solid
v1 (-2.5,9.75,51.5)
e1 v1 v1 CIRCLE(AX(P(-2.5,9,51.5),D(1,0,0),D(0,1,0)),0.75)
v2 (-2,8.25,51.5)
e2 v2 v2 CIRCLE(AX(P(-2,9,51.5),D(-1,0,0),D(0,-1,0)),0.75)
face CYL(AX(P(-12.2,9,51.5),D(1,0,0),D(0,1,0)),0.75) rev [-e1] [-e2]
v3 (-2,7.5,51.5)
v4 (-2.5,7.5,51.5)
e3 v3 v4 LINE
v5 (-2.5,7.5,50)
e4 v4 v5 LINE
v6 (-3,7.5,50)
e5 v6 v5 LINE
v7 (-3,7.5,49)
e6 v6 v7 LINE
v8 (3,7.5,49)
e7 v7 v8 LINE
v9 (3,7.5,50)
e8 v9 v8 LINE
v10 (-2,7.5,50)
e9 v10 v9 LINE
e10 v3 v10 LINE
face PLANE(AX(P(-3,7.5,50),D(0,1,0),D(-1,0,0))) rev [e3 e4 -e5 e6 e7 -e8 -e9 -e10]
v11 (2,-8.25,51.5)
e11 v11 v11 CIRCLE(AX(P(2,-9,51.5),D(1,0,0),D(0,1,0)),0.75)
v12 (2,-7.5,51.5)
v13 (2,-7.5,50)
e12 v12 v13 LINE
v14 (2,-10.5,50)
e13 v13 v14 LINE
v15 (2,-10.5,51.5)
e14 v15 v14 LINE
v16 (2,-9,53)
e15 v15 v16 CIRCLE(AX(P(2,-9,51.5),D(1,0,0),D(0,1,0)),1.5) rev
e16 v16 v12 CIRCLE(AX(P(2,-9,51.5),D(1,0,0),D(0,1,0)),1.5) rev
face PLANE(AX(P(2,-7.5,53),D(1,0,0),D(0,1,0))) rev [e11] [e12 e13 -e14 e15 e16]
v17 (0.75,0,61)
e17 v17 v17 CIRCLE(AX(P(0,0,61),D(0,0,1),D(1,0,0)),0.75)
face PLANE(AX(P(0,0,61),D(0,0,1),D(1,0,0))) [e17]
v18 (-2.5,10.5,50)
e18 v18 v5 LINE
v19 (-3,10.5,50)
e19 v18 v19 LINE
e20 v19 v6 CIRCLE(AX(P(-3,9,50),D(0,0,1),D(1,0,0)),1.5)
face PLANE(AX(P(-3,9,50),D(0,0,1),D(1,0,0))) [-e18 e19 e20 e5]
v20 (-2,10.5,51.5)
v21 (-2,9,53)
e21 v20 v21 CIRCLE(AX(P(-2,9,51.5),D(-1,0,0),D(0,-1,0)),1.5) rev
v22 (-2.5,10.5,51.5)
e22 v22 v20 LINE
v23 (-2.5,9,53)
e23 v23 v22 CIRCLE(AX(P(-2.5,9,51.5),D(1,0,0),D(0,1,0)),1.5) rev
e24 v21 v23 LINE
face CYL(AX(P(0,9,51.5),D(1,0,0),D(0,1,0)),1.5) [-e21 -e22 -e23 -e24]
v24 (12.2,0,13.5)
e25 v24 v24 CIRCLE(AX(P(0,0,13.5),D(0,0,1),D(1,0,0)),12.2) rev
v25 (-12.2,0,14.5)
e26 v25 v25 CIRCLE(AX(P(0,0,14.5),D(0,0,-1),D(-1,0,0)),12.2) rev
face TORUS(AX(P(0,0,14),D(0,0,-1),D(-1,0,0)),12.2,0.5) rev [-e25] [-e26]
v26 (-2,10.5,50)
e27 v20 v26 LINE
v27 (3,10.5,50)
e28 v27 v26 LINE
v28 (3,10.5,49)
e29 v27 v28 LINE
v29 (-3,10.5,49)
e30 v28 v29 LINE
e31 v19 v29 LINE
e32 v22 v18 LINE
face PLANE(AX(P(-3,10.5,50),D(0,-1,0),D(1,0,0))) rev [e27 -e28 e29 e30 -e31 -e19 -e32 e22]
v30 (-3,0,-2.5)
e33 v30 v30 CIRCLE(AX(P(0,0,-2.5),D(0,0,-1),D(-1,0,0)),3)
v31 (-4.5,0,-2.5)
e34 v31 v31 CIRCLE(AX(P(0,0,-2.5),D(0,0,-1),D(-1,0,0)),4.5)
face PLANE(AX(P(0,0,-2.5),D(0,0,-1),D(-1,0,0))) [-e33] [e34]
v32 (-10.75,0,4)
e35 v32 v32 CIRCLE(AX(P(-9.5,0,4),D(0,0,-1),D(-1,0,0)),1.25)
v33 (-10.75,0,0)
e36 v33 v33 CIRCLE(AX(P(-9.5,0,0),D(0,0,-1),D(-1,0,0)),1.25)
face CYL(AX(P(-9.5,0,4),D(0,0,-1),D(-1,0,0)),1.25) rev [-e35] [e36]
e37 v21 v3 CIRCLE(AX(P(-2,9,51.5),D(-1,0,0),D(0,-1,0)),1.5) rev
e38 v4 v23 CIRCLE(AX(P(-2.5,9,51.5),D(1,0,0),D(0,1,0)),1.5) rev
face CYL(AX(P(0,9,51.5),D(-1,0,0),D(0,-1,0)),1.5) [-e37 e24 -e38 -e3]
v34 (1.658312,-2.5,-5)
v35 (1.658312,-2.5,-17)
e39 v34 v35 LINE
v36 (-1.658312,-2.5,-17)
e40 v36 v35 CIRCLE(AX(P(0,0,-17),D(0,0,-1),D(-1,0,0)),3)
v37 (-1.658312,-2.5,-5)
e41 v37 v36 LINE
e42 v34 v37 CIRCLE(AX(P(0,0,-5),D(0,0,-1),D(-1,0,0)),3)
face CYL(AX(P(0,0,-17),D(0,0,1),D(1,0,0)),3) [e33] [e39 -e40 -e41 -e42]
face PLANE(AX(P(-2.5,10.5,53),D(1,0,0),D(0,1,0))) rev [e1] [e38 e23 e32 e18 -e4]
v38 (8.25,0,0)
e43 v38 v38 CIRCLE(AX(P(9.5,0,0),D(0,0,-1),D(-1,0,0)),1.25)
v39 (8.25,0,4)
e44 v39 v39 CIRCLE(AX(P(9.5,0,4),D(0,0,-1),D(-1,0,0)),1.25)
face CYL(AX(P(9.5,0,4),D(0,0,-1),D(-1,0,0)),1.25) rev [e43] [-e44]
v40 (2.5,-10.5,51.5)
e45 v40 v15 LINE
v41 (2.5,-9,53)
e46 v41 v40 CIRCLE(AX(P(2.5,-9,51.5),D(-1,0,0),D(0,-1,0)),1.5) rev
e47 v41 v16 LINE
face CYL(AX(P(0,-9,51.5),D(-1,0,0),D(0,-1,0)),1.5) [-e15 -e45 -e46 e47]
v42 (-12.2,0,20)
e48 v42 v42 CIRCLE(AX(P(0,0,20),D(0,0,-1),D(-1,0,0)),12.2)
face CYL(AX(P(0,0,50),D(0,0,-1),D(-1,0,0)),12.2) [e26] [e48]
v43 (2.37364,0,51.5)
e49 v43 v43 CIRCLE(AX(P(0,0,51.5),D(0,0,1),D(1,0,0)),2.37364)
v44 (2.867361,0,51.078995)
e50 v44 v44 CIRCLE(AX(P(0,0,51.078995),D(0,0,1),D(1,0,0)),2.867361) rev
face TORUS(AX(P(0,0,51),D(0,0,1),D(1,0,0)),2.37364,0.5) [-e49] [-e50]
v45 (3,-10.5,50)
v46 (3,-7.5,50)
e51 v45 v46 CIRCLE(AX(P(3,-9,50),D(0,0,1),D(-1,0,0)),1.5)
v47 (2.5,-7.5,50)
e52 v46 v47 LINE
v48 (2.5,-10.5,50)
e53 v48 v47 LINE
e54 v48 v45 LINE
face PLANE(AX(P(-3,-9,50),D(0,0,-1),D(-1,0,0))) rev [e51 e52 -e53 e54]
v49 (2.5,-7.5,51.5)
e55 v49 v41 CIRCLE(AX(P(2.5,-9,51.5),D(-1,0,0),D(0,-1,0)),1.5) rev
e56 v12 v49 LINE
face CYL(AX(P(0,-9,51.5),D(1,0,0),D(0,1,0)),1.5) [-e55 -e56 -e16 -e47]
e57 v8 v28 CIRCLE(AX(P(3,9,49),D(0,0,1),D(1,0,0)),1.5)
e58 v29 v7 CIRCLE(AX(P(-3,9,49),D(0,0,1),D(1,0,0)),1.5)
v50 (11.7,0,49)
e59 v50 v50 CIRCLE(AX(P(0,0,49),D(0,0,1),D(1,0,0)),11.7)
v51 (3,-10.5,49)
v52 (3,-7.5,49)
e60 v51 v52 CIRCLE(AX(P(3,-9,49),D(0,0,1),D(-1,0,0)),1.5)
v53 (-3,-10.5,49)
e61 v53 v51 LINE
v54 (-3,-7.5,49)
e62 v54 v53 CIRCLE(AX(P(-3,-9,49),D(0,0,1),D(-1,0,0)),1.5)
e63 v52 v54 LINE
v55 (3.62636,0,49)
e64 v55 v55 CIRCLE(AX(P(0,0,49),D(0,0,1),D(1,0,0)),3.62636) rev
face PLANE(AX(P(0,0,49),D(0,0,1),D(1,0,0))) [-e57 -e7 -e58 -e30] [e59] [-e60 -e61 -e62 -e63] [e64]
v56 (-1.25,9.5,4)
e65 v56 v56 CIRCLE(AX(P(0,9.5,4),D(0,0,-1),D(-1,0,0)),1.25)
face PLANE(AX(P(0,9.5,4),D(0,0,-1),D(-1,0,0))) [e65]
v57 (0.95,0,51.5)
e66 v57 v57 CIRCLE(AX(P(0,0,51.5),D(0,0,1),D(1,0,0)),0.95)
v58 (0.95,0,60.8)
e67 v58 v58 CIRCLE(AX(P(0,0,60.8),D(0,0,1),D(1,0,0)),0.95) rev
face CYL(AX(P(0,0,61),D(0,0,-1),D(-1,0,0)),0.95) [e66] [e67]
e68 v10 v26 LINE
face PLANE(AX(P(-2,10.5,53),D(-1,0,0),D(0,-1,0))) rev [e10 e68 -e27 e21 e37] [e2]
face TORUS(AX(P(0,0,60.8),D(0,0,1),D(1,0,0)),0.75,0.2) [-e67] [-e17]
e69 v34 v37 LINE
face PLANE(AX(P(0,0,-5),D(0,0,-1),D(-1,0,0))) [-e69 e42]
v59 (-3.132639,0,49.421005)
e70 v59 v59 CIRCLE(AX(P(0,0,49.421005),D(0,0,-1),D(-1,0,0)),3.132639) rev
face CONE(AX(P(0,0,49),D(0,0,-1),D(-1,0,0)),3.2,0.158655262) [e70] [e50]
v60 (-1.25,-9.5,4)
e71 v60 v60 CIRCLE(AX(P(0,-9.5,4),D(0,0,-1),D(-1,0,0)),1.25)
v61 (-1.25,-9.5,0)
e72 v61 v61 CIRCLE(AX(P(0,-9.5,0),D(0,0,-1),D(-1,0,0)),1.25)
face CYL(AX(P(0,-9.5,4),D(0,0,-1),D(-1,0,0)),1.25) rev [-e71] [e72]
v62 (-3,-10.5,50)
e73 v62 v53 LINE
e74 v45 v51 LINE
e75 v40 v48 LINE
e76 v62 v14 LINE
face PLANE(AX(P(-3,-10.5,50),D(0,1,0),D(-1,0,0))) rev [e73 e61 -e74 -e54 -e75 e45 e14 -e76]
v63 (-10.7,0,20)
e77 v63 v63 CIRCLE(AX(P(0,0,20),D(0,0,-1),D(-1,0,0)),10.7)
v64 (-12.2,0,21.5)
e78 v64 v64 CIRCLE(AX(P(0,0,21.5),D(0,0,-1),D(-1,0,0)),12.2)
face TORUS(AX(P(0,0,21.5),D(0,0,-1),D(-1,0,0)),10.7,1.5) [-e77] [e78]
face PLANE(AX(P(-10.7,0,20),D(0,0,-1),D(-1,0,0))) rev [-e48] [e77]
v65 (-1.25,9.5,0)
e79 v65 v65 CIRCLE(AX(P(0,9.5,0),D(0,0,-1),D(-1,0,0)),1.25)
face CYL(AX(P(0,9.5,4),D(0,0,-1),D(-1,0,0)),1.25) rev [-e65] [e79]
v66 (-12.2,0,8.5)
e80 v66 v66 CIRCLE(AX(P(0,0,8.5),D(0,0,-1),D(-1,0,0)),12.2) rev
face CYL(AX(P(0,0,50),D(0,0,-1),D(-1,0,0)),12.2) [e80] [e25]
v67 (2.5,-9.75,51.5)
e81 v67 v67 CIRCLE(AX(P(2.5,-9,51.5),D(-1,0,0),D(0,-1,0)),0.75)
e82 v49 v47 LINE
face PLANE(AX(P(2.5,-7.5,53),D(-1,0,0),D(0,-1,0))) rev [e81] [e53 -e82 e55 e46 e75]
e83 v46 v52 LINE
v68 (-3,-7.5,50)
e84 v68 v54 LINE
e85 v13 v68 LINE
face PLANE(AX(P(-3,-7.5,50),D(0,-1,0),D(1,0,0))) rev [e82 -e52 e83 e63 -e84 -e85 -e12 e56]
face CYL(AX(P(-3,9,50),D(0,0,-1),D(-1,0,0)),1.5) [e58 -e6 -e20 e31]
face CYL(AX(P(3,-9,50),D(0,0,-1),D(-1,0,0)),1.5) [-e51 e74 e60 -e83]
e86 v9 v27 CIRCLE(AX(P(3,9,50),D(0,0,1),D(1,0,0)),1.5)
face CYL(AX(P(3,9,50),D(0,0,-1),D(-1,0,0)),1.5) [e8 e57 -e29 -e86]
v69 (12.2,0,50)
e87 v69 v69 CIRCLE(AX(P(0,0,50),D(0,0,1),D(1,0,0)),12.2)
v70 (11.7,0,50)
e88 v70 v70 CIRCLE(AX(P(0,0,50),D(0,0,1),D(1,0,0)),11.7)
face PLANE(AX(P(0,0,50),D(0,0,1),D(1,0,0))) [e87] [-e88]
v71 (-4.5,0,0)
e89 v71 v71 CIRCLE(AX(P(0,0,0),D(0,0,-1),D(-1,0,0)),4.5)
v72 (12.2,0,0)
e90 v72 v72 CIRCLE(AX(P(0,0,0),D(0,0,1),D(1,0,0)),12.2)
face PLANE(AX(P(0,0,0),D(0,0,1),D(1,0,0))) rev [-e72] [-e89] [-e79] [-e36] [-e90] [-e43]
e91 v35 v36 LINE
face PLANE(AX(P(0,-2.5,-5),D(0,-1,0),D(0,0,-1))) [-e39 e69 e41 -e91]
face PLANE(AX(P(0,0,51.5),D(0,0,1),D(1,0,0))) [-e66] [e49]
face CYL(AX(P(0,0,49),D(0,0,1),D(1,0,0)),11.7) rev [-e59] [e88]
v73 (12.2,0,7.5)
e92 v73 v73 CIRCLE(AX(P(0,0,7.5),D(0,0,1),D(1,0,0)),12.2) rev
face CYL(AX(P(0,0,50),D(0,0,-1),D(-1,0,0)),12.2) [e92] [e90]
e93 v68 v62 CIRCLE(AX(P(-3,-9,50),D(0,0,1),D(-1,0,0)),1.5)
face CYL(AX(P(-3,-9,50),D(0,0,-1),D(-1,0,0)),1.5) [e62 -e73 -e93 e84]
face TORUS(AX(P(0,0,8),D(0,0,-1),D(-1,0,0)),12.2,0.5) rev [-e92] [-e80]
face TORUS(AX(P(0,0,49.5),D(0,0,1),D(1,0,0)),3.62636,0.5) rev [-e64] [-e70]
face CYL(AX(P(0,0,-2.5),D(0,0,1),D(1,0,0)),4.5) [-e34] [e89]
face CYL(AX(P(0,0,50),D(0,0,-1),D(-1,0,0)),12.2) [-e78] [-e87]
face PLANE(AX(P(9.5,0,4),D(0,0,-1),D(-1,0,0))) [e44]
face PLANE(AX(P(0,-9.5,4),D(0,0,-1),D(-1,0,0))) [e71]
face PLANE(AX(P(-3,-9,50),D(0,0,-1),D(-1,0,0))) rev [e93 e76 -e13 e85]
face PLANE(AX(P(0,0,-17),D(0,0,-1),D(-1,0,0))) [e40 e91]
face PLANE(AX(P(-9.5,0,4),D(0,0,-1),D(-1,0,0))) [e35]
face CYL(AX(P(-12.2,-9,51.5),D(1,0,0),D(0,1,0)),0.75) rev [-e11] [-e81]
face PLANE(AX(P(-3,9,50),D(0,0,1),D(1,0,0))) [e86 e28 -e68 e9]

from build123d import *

# Parameters (mm, degrees)
SKETCH_1_R               = 12.2
EXTRUDE_1_DEPTH          = 50
SKETCH_14_R              = 11.7
CUT_EXTRUDE_4_DEPTH      = 1
FILLET_3_R               = 0.5
SKETCH_16_R              = 0.95
EXTRUDE_7_DEPTH          = 9.5
FILLET_4_R               = 0.2
SKETCH_4_R               = 4.5
EXTRUDE_3_DEPTH          = 2.5
SKETCH_5_R               = 3
EXTRUDE_4_DEPTH          = 14.5
CUT_EXTRUDE_START        = -12
CUT_EXTRUDE_1_DEPTH      = 12
SKETCH_8_R               = 1.25
CUT_EXTRUDE_2_DEPTH      = 4
EXTRUDE_5_DEPTH          = 1
SKETCH_12_W              = 0.5
SKETCH_12_H              = 3
EXTRUDE_6_DEPTH          = 3
FILLET_2_R               = 1.5
CUT_EXTRUDE_3_DEPTH      = 64.80814995
CUT_EXTRUDE_3_DEPTH_BACK = 64.80814995
SKETCH_13_R              = 0.75
SKETCH_17_R              = 0.5


with BuildPart() as part:
    # 草图1 → 凸台-拉伸1 (new body)
    with BuildSketch(Plane.XY):
        Circle(SKETCH_1_R)
    extrude(amount=EXTRUDE_1_DEPTH)

    # 草图14 → 切除-拉伸4 (cut)
    with BuildSketch(Plane.XY.offset(50)):
        Circle(SKETCH_14_R)
    extrude(amount=-CUT_EXTRUDE_4_DEPTH, mode=Mode.SUBTRACT)

    # 草图15 → 旋转1 (revolve)
    with BuildSketch(Plane(origin=(0, 0, 0), x_dir=(1, 0, 0), z_dir=(0, 1, 0))):
        Polygon((0, -49), (0, -51.5), (-2.8, -51.5), (-3.2, -49), align=None)
    revolve(axis=Axis((0, 0, 49), (0, 0, 1)))

    # 圆角3
    fillet_3_edges = [part.edges().sort_by_distance(p)[0] for p in [
        (3.2, 0, 49),
        (2.8, 0, 51.5),
    ]]
    fillet(fillet_3_edges, radius=FILLET_3_R)

    # 草图16 → 凸台-拉伸7 (add)
    with BuildSketch(Plane.XY.offset(51.5)):
        Circle(SKETCH_16_R)
    extrude(amount=EXTRUDE_7_DEPTH)

    # 圆角4
    fillet_4_edges = [part.edges().sort_by_distance(p)[0] for p in [
        (-0.95, 0, 61),
    ]]
    fillet(fillet_4_edges, radius=FILLET_4_R)

    # 草图4 → 凸台-拉伸3 (add)
    with BuildSketch(Plane(origin=(0, 0, 0), x_dir=(-1, 0, 0), z_dir=(0, 0, -1))):
        Circle(SKETCH_4_R)
    extrude(amount=EXTRUDE_3_DEPTH)

    # 草图5 → 凸台-拉伸4 (add)
    with BuildSketch(Plane(origin=(0, 0, -2.5), x_dir=(-1, 0, 0), z_dir=(0, 0, -1))):
        with Locations(Location((0, 0, 0), (0, 0, 180))):
            Circle(SKETCH_5_R)
    extrude(amount=EXTRUDE_4_DEPTH)

    # 草图7 → 切除-拉伸1 (cut)
    with BuildSketch(Plane(origin=(0, 0, -17), x_dir=(-1, 0, 0), z_dir=(0, 0, -1)).offset(CUT_EXTRUDE_START)):
        with BuildLine():
            Line((1.658312395, -2.5), (-1.658312395, -2.5))
            ThreePointArc((-1.658312395, -2.5), (0, -3), (1.658312395, -2.5))
        make_face()
    extrude(amount=CUT_EXTRUDE_1_DEPTH, mode=Mode.SUBTRACT)

    # 草图8 → 切除-拉伸2 (cut)
    with BuildSketch(Plane(origin=(0, 0, 0), x_dir=(-1, 0, 0), z_dir=(0, 0, -1))):
        with Locations((0, 9.5)):
            Circle(SKETCH_8_R)
        with Locations((9.5, 0)):
            Circle(SKETCH_8_R)
        with Locations((0, -9.5)):
            Circle(SKETCH_8_R)
        with Locations((-9.5, 0)):
            Circle(SKETCH_8_R)
    extrude(amount=-CUT_EXTRUDE_2_DEPTH, mode=Mode.SUBTRACT)

    # 草图11 → 凸台-拉伸5 (add)
    with BuildSketch(Plane.XY.offset(49)):
        with BuildLine():
            Line((-3, 10.5), (3, 10.5))
            ThreePointArc((3, 10.5), (4.5, 9), (3, 7.5))
            Line((3, 7.5), (-3, 7.5))
            ThreePointArc((-3, 7.5), (-4.5, 9), (-3, 10.5))
        make_face()
        with BuildLine():
            Line((-3, -10.5), (3, -10.5))
            ThreePointArc((3, -10.5), (4.5, -9), (3, -7.5))
            Line((3, -7.5), (-3, -7.5))
            ThreePointArc((-3, -7.5), (-4.5, -9), (-3, -10.5))
        make_face()
    extrude(amount=EXTRUDE_5_DEPTH)

    # 草图12 → 凸台-拉伸6 (add)
    with BuildSketch(Plane.XY.offset(50)):
        with Locations((-2.25, 9)):
            Rectangle(SKETCH_12_W, SKETCH_12_H)
        with Locations((2.25, -9)):
            Rectangle(SKETCH_12_W, SKETCH_12_H)
    extrude(amount=EXTRUDE_6_DEPTH)

    # 圆角2
    fillet_2_edges = [part.edges().sort_by_distance(p)[0] for p in [
        (-2.25, 7.5, 53),
        (-2.25, 10.5, 53),
        (2.25, -10.5, 53),
        (2.25, -7.5, 53),
    ]]
    fillet(fillet_2_edges, radius=FILLET_2_R - 0.0001)  # a hair under: the kernel refuses the full size

    # 草图13 → 切除-拉伸3 (cut, two sides: drawn at the far end of the back side and taken through both)
    with BuildSketch(Plane(origin=(-2, 0, 0), x_dir=(0, 0, -1), z_dir=(1, 0, 0)).offset(-CUT_EXTRUDE_3_DEPTH_BACK)):
        with Locations(Location((-51.5, 9, 0), (0, 0, 90))):
            Circle(SKETCH_13_R)
        with Locations(Location((-51.5, -9, 0), (0, 0, 90))):
            Circle(SKETCH_13_R)
    extrude(amount=CUT_EXTRUDE_3_DEPTH + CUT_EXTRUDE_3_DEPTH_BACK, mode=Mode.SUBTRACT)

    # 草图17 → 切除-旋转1 (revolve, cut)
    with BuildSketch(Plane(origin=(0, 0, 0), x_dir=(1, 0, 0), z_dir=(0, 1, 0))):
        with Locations((-12.2, -8)):
            Circle(SKETCH_17_R)
        with Locations((-12.2, -14)):
            Circle(SKETCH_17_R)
        with BuildLine():
            Line((-10.7, -20), (-12.2, -20))
            Line((-12.2, -20), (-12.2, -21.5))
            ThreePointArc((-12.2, -21.5), (-11.760660172, -20.439339828), (-10.7, -20))
        make_face()
    revolve(axis=Axis((0, 0, 0), (0, 0, 1)), mode=Mode.SUBTRACT)


solid = part.part
